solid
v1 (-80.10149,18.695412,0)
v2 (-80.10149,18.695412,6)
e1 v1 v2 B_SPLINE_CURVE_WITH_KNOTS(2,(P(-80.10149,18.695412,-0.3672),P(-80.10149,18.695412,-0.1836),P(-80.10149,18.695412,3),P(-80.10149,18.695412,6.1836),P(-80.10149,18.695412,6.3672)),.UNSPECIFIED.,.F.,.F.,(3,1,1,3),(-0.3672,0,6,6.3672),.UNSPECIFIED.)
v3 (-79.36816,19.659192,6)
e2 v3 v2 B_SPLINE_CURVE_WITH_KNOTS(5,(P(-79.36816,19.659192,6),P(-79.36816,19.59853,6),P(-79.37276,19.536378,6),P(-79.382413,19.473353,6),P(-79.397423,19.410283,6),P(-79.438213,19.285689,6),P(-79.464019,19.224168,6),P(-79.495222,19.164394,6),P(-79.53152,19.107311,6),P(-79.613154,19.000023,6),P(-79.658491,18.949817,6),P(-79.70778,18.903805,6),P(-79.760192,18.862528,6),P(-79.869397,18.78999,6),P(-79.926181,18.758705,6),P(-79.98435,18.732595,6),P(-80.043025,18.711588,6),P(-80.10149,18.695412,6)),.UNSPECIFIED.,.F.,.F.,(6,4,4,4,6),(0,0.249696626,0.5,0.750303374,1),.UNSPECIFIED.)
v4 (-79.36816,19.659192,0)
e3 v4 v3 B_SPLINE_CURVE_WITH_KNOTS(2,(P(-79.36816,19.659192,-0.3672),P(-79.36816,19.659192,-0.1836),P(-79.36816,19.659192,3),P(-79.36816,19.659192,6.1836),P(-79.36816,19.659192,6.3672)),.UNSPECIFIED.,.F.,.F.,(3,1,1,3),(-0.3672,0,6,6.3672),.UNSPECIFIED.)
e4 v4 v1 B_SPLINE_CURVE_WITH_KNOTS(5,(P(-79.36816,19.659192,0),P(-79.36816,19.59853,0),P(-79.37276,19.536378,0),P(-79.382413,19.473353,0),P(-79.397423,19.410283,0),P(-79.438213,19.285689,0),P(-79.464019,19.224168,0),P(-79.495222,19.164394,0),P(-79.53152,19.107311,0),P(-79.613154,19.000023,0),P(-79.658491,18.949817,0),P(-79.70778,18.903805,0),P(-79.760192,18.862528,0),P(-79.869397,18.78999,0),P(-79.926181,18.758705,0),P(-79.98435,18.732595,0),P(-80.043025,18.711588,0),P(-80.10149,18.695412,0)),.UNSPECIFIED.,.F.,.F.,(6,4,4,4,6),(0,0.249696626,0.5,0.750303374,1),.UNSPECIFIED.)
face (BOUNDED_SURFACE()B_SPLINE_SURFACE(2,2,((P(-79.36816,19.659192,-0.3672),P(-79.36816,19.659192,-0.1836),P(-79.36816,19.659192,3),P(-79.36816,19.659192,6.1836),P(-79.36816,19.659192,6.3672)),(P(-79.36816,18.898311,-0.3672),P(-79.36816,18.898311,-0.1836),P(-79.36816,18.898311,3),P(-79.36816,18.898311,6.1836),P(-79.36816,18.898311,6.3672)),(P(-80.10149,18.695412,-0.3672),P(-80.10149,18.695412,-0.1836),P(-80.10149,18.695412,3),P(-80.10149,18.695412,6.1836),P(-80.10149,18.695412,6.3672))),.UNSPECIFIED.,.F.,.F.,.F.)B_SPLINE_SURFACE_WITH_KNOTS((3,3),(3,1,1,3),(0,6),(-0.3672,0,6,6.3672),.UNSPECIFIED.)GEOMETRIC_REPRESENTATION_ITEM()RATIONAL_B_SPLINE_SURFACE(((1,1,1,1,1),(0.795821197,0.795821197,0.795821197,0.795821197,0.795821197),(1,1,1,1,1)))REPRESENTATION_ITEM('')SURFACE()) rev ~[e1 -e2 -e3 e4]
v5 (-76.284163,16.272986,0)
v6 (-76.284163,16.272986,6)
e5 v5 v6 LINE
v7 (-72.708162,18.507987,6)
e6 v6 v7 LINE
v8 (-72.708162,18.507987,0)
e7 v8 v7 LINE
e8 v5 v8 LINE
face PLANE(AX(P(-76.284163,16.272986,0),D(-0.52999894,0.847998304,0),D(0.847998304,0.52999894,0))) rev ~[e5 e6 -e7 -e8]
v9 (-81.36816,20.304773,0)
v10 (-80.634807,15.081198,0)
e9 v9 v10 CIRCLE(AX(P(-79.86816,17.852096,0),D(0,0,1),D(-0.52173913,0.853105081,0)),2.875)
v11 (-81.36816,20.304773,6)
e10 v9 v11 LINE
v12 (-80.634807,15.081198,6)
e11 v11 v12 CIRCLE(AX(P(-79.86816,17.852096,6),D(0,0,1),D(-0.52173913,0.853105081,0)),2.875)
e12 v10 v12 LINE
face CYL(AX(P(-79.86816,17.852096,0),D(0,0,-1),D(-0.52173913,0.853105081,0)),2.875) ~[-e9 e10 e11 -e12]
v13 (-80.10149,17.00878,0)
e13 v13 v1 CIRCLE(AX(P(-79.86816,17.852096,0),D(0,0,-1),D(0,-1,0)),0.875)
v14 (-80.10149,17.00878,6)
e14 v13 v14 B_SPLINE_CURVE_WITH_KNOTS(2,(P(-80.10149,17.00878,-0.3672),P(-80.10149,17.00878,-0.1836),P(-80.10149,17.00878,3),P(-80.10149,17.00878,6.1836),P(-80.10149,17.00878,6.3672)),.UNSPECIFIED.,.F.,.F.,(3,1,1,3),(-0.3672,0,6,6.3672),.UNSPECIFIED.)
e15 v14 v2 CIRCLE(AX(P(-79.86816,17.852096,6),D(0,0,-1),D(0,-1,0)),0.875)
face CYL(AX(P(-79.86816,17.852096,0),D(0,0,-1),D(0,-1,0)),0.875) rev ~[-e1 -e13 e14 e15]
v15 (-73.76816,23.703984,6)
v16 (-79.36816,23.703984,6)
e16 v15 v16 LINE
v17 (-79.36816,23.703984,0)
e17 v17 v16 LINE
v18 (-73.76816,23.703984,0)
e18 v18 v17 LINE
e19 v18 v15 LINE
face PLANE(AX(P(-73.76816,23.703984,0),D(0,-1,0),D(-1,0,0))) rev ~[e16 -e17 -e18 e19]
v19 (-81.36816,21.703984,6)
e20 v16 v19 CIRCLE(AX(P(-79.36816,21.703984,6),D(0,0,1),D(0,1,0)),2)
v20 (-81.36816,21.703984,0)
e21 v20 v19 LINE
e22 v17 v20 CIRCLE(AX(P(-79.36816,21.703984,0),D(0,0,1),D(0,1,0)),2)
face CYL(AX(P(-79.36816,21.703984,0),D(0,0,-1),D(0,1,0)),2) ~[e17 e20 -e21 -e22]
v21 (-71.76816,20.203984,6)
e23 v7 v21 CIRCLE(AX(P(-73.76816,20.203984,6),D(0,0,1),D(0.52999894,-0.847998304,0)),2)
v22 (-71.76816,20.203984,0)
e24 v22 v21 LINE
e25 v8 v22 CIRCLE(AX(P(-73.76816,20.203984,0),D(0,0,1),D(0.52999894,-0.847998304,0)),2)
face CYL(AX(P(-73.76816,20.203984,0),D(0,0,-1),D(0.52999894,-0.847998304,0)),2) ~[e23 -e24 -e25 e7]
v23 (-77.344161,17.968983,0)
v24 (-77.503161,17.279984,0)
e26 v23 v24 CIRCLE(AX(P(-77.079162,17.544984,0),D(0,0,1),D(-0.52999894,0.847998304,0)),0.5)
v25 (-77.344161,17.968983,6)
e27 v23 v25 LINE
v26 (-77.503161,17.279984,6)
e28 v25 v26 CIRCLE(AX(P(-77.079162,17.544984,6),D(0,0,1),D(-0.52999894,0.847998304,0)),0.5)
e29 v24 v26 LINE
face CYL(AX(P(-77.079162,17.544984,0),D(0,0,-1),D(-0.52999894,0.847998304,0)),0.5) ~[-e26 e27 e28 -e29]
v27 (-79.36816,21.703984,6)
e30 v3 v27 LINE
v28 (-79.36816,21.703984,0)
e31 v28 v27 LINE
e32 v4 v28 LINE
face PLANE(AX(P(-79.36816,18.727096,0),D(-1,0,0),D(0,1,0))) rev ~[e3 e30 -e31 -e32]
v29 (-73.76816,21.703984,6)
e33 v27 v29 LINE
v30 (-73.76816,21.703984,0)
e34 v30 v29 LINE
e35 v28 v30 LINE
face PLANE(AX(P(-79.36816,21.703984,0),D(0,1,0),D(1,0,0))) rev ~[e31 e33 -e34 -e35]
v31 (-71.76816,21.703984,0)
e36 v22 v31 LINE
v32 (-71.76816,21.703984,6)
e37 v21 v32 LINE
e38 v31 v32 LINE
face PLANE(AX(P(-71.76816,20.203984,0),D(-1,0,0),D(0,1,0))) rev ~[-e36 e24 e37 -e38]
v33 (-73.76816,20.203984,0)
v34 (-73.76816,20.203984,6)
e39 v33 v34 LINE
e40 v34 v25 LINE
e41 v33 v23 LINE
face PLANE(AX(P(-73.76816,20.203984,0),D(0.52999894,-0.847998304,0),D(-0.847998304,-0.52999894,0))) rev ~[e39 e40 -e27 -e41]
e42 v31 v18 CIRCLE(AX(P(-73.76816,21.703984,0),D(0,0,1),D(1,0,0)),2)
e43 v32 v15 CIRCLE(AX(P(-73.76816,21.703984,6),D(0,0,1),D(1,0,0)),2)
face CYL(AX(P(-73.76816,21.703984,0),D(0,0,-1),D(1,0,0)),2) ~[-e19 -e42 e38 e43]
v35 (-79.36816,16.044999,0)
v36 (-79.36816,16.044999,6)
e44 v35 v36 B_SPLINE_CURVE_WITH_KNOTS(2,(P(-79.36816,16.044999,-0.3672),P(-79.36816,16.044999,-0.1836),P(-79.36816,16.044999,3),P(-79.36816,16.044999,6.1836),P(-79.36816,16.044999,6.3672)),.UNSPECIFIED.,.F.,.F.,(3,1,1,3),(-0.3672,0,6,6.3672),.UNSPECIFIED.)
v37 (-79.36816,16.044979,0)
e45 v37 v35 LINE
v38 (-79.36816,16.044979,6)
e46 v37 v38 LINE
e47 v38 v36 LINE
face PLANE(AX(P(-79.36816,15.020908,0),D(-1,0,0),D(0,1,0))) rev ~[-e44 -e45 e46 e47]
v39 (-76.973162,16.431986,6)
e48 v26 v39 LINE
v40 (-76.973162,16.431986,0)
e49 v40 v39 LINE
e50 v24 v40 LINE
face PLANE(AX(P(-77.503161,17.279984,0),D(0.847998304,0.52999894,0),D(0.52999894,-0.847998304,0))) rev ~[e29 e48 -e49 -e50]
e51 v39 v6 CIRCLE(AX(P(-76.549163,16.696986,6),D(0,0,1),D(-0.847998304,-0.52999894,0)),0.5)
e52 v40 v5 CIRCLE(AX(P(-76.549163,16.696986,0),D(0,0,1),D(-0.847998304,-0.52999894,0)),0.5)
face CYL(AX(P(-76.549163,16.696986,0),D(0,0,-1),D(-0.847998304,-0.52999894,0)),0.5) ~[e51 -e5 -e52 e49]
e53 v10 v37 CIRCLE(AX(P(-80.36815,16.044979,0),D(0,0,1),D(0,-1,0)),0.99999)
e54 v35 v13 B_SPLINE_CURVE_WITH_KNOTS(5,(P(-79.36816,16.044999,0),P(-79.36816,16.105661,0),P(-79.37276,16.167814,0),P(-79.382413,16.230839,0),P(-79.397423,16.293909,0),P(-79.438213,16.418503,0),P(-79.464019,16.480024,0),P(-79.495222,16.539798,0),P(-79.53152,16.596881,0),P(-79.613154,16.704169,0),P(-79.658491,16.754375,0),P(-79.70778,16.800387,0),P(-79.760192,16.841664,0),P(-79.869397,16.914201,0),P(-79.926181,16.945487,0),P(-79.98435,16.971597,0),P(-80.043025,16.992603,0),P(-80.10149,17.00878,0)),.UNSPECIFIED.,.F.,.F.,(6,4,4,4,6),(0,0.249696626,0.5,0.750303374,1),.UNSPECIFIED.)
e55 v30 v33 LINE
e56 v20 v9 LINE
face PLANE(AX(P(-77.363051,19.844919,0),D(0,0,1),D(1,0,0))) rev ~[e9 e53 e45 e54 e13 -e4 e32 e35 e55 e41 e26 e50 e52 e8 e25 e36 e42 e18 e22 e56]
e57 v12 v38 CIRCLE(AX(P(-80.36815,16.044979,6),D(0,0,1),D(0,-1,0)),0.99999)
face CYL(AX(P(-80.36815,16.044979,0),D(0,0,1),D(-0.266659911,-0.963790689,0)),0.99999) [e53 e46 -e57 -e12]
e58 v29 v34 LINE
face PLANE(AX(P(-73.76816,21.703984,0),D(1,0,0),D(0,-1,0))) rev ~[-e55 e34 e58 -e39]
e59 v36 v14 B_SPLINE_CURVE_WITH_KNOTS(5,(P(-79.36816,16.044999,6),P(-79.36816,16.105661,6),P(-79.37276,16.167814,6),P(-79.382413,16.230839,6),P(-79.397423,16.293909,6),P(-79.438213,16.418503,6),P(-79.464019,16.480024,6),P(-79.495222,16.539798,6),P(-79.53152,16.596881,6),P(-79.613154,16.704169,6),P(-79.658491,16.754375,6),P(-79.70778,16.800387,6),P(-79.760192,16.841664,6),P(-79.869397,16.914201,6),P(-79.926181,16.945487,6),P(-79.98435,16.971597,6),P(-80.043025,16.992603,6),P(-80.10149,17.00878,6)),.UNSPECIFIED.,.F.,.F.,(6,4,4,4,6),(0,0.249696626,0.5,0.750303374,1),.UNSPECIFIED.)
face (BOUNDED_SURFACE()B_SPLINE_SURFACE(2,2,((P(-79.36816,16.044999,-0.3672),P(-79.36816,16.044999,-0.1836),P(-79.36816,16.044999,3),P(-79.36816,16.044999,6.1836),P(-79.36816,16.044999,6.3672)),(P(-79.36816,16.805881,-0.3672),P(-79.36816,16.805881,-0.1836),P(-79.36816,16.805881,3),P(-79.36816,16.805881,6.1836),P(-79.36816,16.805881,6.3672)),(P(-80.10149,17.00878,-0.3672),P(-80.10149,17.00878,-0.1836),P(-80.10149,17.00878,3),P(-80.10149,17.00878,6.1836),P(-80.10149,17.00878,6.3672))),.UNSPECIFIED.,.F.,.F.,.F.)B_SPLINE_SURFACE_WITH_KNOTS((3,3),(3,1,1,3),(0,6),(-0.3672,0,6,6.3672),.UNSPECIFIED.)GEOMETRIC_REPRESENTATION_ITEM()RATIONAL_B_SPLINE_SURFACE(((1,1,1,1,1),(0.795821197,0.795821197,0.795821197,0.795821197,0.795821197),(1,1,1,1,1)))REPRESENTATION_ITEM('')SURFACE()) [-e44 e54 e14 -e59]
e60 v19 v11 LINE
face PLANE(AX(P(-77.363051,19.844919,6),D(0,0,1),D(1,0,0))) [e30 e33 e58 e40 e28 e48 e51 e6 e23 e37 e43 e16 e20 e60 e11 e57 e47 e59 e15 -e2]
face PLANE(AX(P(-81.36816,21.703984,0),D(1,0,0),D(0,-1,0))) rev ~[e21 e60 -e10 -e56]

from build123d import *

# Parameters (mm, degrees)
F1_DEPTH = 6
F2_R     = 0.99999


# Not quite as in the source:
# - a fillet or chamfer is up to 0.001 mm smaller than in the source, because OpenCascade refuses the exact size


with BuildPart() as f1:
    # F0 (on Top) → F1 (new body)
    with BuildSketch(Plane.XY):
        with BuildLine():
            Line((-79.3681601882, 18.7270958871), (-79.3681601882, 21.703983524))
            Line((-79.3681601882, 21.703983524), (-73.7681601882, 21.703983524))
            Line((-73.7681601882, 21.703983524), (-73.7681601882, 20.203983524))
            Line((-73.7681601882, 20.203983524), (-77.3441610362, 17.968982994))
            ThreePointArc((-77.3441610362, 17.968982994), (-77.566357164, 17.6574135954), (-77.5031607182, 17.279984372))
            Line((-77.5031607182, 17.279984372), (-76.9731617782, 16.431986068))
            ThreePointArc((-76.9731617782, 16.431986068), (-76.6615923795, 16.2097899402), (-76.2841631562, 16.272986386))
            Line((-76.2841631562, 16.272986386), (-72.7081623082, 18.507986916))
            ThreePointArc((-72.7081623082, 18.507986916), (-72.0188752257, 19.2344464592), (-71.7681601882, 20.203983524))
            Line((-71.7681601882, 20.203983524), (-71.7681601882, 21.703983524))
            ThreePointArc((-71.7681601882, 21.703983524), (-72.3539466258, 23.1181970864), (-73.7681601882, 23.703983524))
            Line((-73.7681601882, 23.703983524), (-79.3681601882, 23.703983524))
            ThreePointArc((-79.3681601882, 23.703983524), (-80.7823737506, 23.1181970864), (-81.3681601882, 21.703983524))
            Line((-81.3681601882, 21.703983524), (-81.3681601882, 20.3047729959))
            ThreePointArc((-81.3681601882, 20.3047729959), (-82.5569903042, 16.8343446369), (-79.3681601882, 15.0209079738))
            Line((-79.3681601882, 15.0209079738), (-79.3681601882, 16.9770958871))
            Line((-79.3681601882, 16.9770958871), (-79.8681601882, 16.9770958871))
            ThreePointArc((-79.8681601882, 16.9770958871), (-80.7431601882, 17.8520958871), (-79.8681601882, 18.7270958871))
            Line((-79.8681601882, 18.7270958871), (-79.3681601882, 18.7270958871))
        make_face()
    extrude(amount=F1_DEPTH)

    # F2 (radius 1 in the source; OpenCascade refuses exactly that, so slightly less here)
    f2_edges = [f1.edges().sort_by_distance(p)[0] for p in [
        (-79.36816, 15.020908, 3),
        (-79.36816, 18.727096, 3),
        (-79.36816, 16.977096, 3),
    ]]
    fillet(f2_edges, radius=F2_R)


solid = f1.part
